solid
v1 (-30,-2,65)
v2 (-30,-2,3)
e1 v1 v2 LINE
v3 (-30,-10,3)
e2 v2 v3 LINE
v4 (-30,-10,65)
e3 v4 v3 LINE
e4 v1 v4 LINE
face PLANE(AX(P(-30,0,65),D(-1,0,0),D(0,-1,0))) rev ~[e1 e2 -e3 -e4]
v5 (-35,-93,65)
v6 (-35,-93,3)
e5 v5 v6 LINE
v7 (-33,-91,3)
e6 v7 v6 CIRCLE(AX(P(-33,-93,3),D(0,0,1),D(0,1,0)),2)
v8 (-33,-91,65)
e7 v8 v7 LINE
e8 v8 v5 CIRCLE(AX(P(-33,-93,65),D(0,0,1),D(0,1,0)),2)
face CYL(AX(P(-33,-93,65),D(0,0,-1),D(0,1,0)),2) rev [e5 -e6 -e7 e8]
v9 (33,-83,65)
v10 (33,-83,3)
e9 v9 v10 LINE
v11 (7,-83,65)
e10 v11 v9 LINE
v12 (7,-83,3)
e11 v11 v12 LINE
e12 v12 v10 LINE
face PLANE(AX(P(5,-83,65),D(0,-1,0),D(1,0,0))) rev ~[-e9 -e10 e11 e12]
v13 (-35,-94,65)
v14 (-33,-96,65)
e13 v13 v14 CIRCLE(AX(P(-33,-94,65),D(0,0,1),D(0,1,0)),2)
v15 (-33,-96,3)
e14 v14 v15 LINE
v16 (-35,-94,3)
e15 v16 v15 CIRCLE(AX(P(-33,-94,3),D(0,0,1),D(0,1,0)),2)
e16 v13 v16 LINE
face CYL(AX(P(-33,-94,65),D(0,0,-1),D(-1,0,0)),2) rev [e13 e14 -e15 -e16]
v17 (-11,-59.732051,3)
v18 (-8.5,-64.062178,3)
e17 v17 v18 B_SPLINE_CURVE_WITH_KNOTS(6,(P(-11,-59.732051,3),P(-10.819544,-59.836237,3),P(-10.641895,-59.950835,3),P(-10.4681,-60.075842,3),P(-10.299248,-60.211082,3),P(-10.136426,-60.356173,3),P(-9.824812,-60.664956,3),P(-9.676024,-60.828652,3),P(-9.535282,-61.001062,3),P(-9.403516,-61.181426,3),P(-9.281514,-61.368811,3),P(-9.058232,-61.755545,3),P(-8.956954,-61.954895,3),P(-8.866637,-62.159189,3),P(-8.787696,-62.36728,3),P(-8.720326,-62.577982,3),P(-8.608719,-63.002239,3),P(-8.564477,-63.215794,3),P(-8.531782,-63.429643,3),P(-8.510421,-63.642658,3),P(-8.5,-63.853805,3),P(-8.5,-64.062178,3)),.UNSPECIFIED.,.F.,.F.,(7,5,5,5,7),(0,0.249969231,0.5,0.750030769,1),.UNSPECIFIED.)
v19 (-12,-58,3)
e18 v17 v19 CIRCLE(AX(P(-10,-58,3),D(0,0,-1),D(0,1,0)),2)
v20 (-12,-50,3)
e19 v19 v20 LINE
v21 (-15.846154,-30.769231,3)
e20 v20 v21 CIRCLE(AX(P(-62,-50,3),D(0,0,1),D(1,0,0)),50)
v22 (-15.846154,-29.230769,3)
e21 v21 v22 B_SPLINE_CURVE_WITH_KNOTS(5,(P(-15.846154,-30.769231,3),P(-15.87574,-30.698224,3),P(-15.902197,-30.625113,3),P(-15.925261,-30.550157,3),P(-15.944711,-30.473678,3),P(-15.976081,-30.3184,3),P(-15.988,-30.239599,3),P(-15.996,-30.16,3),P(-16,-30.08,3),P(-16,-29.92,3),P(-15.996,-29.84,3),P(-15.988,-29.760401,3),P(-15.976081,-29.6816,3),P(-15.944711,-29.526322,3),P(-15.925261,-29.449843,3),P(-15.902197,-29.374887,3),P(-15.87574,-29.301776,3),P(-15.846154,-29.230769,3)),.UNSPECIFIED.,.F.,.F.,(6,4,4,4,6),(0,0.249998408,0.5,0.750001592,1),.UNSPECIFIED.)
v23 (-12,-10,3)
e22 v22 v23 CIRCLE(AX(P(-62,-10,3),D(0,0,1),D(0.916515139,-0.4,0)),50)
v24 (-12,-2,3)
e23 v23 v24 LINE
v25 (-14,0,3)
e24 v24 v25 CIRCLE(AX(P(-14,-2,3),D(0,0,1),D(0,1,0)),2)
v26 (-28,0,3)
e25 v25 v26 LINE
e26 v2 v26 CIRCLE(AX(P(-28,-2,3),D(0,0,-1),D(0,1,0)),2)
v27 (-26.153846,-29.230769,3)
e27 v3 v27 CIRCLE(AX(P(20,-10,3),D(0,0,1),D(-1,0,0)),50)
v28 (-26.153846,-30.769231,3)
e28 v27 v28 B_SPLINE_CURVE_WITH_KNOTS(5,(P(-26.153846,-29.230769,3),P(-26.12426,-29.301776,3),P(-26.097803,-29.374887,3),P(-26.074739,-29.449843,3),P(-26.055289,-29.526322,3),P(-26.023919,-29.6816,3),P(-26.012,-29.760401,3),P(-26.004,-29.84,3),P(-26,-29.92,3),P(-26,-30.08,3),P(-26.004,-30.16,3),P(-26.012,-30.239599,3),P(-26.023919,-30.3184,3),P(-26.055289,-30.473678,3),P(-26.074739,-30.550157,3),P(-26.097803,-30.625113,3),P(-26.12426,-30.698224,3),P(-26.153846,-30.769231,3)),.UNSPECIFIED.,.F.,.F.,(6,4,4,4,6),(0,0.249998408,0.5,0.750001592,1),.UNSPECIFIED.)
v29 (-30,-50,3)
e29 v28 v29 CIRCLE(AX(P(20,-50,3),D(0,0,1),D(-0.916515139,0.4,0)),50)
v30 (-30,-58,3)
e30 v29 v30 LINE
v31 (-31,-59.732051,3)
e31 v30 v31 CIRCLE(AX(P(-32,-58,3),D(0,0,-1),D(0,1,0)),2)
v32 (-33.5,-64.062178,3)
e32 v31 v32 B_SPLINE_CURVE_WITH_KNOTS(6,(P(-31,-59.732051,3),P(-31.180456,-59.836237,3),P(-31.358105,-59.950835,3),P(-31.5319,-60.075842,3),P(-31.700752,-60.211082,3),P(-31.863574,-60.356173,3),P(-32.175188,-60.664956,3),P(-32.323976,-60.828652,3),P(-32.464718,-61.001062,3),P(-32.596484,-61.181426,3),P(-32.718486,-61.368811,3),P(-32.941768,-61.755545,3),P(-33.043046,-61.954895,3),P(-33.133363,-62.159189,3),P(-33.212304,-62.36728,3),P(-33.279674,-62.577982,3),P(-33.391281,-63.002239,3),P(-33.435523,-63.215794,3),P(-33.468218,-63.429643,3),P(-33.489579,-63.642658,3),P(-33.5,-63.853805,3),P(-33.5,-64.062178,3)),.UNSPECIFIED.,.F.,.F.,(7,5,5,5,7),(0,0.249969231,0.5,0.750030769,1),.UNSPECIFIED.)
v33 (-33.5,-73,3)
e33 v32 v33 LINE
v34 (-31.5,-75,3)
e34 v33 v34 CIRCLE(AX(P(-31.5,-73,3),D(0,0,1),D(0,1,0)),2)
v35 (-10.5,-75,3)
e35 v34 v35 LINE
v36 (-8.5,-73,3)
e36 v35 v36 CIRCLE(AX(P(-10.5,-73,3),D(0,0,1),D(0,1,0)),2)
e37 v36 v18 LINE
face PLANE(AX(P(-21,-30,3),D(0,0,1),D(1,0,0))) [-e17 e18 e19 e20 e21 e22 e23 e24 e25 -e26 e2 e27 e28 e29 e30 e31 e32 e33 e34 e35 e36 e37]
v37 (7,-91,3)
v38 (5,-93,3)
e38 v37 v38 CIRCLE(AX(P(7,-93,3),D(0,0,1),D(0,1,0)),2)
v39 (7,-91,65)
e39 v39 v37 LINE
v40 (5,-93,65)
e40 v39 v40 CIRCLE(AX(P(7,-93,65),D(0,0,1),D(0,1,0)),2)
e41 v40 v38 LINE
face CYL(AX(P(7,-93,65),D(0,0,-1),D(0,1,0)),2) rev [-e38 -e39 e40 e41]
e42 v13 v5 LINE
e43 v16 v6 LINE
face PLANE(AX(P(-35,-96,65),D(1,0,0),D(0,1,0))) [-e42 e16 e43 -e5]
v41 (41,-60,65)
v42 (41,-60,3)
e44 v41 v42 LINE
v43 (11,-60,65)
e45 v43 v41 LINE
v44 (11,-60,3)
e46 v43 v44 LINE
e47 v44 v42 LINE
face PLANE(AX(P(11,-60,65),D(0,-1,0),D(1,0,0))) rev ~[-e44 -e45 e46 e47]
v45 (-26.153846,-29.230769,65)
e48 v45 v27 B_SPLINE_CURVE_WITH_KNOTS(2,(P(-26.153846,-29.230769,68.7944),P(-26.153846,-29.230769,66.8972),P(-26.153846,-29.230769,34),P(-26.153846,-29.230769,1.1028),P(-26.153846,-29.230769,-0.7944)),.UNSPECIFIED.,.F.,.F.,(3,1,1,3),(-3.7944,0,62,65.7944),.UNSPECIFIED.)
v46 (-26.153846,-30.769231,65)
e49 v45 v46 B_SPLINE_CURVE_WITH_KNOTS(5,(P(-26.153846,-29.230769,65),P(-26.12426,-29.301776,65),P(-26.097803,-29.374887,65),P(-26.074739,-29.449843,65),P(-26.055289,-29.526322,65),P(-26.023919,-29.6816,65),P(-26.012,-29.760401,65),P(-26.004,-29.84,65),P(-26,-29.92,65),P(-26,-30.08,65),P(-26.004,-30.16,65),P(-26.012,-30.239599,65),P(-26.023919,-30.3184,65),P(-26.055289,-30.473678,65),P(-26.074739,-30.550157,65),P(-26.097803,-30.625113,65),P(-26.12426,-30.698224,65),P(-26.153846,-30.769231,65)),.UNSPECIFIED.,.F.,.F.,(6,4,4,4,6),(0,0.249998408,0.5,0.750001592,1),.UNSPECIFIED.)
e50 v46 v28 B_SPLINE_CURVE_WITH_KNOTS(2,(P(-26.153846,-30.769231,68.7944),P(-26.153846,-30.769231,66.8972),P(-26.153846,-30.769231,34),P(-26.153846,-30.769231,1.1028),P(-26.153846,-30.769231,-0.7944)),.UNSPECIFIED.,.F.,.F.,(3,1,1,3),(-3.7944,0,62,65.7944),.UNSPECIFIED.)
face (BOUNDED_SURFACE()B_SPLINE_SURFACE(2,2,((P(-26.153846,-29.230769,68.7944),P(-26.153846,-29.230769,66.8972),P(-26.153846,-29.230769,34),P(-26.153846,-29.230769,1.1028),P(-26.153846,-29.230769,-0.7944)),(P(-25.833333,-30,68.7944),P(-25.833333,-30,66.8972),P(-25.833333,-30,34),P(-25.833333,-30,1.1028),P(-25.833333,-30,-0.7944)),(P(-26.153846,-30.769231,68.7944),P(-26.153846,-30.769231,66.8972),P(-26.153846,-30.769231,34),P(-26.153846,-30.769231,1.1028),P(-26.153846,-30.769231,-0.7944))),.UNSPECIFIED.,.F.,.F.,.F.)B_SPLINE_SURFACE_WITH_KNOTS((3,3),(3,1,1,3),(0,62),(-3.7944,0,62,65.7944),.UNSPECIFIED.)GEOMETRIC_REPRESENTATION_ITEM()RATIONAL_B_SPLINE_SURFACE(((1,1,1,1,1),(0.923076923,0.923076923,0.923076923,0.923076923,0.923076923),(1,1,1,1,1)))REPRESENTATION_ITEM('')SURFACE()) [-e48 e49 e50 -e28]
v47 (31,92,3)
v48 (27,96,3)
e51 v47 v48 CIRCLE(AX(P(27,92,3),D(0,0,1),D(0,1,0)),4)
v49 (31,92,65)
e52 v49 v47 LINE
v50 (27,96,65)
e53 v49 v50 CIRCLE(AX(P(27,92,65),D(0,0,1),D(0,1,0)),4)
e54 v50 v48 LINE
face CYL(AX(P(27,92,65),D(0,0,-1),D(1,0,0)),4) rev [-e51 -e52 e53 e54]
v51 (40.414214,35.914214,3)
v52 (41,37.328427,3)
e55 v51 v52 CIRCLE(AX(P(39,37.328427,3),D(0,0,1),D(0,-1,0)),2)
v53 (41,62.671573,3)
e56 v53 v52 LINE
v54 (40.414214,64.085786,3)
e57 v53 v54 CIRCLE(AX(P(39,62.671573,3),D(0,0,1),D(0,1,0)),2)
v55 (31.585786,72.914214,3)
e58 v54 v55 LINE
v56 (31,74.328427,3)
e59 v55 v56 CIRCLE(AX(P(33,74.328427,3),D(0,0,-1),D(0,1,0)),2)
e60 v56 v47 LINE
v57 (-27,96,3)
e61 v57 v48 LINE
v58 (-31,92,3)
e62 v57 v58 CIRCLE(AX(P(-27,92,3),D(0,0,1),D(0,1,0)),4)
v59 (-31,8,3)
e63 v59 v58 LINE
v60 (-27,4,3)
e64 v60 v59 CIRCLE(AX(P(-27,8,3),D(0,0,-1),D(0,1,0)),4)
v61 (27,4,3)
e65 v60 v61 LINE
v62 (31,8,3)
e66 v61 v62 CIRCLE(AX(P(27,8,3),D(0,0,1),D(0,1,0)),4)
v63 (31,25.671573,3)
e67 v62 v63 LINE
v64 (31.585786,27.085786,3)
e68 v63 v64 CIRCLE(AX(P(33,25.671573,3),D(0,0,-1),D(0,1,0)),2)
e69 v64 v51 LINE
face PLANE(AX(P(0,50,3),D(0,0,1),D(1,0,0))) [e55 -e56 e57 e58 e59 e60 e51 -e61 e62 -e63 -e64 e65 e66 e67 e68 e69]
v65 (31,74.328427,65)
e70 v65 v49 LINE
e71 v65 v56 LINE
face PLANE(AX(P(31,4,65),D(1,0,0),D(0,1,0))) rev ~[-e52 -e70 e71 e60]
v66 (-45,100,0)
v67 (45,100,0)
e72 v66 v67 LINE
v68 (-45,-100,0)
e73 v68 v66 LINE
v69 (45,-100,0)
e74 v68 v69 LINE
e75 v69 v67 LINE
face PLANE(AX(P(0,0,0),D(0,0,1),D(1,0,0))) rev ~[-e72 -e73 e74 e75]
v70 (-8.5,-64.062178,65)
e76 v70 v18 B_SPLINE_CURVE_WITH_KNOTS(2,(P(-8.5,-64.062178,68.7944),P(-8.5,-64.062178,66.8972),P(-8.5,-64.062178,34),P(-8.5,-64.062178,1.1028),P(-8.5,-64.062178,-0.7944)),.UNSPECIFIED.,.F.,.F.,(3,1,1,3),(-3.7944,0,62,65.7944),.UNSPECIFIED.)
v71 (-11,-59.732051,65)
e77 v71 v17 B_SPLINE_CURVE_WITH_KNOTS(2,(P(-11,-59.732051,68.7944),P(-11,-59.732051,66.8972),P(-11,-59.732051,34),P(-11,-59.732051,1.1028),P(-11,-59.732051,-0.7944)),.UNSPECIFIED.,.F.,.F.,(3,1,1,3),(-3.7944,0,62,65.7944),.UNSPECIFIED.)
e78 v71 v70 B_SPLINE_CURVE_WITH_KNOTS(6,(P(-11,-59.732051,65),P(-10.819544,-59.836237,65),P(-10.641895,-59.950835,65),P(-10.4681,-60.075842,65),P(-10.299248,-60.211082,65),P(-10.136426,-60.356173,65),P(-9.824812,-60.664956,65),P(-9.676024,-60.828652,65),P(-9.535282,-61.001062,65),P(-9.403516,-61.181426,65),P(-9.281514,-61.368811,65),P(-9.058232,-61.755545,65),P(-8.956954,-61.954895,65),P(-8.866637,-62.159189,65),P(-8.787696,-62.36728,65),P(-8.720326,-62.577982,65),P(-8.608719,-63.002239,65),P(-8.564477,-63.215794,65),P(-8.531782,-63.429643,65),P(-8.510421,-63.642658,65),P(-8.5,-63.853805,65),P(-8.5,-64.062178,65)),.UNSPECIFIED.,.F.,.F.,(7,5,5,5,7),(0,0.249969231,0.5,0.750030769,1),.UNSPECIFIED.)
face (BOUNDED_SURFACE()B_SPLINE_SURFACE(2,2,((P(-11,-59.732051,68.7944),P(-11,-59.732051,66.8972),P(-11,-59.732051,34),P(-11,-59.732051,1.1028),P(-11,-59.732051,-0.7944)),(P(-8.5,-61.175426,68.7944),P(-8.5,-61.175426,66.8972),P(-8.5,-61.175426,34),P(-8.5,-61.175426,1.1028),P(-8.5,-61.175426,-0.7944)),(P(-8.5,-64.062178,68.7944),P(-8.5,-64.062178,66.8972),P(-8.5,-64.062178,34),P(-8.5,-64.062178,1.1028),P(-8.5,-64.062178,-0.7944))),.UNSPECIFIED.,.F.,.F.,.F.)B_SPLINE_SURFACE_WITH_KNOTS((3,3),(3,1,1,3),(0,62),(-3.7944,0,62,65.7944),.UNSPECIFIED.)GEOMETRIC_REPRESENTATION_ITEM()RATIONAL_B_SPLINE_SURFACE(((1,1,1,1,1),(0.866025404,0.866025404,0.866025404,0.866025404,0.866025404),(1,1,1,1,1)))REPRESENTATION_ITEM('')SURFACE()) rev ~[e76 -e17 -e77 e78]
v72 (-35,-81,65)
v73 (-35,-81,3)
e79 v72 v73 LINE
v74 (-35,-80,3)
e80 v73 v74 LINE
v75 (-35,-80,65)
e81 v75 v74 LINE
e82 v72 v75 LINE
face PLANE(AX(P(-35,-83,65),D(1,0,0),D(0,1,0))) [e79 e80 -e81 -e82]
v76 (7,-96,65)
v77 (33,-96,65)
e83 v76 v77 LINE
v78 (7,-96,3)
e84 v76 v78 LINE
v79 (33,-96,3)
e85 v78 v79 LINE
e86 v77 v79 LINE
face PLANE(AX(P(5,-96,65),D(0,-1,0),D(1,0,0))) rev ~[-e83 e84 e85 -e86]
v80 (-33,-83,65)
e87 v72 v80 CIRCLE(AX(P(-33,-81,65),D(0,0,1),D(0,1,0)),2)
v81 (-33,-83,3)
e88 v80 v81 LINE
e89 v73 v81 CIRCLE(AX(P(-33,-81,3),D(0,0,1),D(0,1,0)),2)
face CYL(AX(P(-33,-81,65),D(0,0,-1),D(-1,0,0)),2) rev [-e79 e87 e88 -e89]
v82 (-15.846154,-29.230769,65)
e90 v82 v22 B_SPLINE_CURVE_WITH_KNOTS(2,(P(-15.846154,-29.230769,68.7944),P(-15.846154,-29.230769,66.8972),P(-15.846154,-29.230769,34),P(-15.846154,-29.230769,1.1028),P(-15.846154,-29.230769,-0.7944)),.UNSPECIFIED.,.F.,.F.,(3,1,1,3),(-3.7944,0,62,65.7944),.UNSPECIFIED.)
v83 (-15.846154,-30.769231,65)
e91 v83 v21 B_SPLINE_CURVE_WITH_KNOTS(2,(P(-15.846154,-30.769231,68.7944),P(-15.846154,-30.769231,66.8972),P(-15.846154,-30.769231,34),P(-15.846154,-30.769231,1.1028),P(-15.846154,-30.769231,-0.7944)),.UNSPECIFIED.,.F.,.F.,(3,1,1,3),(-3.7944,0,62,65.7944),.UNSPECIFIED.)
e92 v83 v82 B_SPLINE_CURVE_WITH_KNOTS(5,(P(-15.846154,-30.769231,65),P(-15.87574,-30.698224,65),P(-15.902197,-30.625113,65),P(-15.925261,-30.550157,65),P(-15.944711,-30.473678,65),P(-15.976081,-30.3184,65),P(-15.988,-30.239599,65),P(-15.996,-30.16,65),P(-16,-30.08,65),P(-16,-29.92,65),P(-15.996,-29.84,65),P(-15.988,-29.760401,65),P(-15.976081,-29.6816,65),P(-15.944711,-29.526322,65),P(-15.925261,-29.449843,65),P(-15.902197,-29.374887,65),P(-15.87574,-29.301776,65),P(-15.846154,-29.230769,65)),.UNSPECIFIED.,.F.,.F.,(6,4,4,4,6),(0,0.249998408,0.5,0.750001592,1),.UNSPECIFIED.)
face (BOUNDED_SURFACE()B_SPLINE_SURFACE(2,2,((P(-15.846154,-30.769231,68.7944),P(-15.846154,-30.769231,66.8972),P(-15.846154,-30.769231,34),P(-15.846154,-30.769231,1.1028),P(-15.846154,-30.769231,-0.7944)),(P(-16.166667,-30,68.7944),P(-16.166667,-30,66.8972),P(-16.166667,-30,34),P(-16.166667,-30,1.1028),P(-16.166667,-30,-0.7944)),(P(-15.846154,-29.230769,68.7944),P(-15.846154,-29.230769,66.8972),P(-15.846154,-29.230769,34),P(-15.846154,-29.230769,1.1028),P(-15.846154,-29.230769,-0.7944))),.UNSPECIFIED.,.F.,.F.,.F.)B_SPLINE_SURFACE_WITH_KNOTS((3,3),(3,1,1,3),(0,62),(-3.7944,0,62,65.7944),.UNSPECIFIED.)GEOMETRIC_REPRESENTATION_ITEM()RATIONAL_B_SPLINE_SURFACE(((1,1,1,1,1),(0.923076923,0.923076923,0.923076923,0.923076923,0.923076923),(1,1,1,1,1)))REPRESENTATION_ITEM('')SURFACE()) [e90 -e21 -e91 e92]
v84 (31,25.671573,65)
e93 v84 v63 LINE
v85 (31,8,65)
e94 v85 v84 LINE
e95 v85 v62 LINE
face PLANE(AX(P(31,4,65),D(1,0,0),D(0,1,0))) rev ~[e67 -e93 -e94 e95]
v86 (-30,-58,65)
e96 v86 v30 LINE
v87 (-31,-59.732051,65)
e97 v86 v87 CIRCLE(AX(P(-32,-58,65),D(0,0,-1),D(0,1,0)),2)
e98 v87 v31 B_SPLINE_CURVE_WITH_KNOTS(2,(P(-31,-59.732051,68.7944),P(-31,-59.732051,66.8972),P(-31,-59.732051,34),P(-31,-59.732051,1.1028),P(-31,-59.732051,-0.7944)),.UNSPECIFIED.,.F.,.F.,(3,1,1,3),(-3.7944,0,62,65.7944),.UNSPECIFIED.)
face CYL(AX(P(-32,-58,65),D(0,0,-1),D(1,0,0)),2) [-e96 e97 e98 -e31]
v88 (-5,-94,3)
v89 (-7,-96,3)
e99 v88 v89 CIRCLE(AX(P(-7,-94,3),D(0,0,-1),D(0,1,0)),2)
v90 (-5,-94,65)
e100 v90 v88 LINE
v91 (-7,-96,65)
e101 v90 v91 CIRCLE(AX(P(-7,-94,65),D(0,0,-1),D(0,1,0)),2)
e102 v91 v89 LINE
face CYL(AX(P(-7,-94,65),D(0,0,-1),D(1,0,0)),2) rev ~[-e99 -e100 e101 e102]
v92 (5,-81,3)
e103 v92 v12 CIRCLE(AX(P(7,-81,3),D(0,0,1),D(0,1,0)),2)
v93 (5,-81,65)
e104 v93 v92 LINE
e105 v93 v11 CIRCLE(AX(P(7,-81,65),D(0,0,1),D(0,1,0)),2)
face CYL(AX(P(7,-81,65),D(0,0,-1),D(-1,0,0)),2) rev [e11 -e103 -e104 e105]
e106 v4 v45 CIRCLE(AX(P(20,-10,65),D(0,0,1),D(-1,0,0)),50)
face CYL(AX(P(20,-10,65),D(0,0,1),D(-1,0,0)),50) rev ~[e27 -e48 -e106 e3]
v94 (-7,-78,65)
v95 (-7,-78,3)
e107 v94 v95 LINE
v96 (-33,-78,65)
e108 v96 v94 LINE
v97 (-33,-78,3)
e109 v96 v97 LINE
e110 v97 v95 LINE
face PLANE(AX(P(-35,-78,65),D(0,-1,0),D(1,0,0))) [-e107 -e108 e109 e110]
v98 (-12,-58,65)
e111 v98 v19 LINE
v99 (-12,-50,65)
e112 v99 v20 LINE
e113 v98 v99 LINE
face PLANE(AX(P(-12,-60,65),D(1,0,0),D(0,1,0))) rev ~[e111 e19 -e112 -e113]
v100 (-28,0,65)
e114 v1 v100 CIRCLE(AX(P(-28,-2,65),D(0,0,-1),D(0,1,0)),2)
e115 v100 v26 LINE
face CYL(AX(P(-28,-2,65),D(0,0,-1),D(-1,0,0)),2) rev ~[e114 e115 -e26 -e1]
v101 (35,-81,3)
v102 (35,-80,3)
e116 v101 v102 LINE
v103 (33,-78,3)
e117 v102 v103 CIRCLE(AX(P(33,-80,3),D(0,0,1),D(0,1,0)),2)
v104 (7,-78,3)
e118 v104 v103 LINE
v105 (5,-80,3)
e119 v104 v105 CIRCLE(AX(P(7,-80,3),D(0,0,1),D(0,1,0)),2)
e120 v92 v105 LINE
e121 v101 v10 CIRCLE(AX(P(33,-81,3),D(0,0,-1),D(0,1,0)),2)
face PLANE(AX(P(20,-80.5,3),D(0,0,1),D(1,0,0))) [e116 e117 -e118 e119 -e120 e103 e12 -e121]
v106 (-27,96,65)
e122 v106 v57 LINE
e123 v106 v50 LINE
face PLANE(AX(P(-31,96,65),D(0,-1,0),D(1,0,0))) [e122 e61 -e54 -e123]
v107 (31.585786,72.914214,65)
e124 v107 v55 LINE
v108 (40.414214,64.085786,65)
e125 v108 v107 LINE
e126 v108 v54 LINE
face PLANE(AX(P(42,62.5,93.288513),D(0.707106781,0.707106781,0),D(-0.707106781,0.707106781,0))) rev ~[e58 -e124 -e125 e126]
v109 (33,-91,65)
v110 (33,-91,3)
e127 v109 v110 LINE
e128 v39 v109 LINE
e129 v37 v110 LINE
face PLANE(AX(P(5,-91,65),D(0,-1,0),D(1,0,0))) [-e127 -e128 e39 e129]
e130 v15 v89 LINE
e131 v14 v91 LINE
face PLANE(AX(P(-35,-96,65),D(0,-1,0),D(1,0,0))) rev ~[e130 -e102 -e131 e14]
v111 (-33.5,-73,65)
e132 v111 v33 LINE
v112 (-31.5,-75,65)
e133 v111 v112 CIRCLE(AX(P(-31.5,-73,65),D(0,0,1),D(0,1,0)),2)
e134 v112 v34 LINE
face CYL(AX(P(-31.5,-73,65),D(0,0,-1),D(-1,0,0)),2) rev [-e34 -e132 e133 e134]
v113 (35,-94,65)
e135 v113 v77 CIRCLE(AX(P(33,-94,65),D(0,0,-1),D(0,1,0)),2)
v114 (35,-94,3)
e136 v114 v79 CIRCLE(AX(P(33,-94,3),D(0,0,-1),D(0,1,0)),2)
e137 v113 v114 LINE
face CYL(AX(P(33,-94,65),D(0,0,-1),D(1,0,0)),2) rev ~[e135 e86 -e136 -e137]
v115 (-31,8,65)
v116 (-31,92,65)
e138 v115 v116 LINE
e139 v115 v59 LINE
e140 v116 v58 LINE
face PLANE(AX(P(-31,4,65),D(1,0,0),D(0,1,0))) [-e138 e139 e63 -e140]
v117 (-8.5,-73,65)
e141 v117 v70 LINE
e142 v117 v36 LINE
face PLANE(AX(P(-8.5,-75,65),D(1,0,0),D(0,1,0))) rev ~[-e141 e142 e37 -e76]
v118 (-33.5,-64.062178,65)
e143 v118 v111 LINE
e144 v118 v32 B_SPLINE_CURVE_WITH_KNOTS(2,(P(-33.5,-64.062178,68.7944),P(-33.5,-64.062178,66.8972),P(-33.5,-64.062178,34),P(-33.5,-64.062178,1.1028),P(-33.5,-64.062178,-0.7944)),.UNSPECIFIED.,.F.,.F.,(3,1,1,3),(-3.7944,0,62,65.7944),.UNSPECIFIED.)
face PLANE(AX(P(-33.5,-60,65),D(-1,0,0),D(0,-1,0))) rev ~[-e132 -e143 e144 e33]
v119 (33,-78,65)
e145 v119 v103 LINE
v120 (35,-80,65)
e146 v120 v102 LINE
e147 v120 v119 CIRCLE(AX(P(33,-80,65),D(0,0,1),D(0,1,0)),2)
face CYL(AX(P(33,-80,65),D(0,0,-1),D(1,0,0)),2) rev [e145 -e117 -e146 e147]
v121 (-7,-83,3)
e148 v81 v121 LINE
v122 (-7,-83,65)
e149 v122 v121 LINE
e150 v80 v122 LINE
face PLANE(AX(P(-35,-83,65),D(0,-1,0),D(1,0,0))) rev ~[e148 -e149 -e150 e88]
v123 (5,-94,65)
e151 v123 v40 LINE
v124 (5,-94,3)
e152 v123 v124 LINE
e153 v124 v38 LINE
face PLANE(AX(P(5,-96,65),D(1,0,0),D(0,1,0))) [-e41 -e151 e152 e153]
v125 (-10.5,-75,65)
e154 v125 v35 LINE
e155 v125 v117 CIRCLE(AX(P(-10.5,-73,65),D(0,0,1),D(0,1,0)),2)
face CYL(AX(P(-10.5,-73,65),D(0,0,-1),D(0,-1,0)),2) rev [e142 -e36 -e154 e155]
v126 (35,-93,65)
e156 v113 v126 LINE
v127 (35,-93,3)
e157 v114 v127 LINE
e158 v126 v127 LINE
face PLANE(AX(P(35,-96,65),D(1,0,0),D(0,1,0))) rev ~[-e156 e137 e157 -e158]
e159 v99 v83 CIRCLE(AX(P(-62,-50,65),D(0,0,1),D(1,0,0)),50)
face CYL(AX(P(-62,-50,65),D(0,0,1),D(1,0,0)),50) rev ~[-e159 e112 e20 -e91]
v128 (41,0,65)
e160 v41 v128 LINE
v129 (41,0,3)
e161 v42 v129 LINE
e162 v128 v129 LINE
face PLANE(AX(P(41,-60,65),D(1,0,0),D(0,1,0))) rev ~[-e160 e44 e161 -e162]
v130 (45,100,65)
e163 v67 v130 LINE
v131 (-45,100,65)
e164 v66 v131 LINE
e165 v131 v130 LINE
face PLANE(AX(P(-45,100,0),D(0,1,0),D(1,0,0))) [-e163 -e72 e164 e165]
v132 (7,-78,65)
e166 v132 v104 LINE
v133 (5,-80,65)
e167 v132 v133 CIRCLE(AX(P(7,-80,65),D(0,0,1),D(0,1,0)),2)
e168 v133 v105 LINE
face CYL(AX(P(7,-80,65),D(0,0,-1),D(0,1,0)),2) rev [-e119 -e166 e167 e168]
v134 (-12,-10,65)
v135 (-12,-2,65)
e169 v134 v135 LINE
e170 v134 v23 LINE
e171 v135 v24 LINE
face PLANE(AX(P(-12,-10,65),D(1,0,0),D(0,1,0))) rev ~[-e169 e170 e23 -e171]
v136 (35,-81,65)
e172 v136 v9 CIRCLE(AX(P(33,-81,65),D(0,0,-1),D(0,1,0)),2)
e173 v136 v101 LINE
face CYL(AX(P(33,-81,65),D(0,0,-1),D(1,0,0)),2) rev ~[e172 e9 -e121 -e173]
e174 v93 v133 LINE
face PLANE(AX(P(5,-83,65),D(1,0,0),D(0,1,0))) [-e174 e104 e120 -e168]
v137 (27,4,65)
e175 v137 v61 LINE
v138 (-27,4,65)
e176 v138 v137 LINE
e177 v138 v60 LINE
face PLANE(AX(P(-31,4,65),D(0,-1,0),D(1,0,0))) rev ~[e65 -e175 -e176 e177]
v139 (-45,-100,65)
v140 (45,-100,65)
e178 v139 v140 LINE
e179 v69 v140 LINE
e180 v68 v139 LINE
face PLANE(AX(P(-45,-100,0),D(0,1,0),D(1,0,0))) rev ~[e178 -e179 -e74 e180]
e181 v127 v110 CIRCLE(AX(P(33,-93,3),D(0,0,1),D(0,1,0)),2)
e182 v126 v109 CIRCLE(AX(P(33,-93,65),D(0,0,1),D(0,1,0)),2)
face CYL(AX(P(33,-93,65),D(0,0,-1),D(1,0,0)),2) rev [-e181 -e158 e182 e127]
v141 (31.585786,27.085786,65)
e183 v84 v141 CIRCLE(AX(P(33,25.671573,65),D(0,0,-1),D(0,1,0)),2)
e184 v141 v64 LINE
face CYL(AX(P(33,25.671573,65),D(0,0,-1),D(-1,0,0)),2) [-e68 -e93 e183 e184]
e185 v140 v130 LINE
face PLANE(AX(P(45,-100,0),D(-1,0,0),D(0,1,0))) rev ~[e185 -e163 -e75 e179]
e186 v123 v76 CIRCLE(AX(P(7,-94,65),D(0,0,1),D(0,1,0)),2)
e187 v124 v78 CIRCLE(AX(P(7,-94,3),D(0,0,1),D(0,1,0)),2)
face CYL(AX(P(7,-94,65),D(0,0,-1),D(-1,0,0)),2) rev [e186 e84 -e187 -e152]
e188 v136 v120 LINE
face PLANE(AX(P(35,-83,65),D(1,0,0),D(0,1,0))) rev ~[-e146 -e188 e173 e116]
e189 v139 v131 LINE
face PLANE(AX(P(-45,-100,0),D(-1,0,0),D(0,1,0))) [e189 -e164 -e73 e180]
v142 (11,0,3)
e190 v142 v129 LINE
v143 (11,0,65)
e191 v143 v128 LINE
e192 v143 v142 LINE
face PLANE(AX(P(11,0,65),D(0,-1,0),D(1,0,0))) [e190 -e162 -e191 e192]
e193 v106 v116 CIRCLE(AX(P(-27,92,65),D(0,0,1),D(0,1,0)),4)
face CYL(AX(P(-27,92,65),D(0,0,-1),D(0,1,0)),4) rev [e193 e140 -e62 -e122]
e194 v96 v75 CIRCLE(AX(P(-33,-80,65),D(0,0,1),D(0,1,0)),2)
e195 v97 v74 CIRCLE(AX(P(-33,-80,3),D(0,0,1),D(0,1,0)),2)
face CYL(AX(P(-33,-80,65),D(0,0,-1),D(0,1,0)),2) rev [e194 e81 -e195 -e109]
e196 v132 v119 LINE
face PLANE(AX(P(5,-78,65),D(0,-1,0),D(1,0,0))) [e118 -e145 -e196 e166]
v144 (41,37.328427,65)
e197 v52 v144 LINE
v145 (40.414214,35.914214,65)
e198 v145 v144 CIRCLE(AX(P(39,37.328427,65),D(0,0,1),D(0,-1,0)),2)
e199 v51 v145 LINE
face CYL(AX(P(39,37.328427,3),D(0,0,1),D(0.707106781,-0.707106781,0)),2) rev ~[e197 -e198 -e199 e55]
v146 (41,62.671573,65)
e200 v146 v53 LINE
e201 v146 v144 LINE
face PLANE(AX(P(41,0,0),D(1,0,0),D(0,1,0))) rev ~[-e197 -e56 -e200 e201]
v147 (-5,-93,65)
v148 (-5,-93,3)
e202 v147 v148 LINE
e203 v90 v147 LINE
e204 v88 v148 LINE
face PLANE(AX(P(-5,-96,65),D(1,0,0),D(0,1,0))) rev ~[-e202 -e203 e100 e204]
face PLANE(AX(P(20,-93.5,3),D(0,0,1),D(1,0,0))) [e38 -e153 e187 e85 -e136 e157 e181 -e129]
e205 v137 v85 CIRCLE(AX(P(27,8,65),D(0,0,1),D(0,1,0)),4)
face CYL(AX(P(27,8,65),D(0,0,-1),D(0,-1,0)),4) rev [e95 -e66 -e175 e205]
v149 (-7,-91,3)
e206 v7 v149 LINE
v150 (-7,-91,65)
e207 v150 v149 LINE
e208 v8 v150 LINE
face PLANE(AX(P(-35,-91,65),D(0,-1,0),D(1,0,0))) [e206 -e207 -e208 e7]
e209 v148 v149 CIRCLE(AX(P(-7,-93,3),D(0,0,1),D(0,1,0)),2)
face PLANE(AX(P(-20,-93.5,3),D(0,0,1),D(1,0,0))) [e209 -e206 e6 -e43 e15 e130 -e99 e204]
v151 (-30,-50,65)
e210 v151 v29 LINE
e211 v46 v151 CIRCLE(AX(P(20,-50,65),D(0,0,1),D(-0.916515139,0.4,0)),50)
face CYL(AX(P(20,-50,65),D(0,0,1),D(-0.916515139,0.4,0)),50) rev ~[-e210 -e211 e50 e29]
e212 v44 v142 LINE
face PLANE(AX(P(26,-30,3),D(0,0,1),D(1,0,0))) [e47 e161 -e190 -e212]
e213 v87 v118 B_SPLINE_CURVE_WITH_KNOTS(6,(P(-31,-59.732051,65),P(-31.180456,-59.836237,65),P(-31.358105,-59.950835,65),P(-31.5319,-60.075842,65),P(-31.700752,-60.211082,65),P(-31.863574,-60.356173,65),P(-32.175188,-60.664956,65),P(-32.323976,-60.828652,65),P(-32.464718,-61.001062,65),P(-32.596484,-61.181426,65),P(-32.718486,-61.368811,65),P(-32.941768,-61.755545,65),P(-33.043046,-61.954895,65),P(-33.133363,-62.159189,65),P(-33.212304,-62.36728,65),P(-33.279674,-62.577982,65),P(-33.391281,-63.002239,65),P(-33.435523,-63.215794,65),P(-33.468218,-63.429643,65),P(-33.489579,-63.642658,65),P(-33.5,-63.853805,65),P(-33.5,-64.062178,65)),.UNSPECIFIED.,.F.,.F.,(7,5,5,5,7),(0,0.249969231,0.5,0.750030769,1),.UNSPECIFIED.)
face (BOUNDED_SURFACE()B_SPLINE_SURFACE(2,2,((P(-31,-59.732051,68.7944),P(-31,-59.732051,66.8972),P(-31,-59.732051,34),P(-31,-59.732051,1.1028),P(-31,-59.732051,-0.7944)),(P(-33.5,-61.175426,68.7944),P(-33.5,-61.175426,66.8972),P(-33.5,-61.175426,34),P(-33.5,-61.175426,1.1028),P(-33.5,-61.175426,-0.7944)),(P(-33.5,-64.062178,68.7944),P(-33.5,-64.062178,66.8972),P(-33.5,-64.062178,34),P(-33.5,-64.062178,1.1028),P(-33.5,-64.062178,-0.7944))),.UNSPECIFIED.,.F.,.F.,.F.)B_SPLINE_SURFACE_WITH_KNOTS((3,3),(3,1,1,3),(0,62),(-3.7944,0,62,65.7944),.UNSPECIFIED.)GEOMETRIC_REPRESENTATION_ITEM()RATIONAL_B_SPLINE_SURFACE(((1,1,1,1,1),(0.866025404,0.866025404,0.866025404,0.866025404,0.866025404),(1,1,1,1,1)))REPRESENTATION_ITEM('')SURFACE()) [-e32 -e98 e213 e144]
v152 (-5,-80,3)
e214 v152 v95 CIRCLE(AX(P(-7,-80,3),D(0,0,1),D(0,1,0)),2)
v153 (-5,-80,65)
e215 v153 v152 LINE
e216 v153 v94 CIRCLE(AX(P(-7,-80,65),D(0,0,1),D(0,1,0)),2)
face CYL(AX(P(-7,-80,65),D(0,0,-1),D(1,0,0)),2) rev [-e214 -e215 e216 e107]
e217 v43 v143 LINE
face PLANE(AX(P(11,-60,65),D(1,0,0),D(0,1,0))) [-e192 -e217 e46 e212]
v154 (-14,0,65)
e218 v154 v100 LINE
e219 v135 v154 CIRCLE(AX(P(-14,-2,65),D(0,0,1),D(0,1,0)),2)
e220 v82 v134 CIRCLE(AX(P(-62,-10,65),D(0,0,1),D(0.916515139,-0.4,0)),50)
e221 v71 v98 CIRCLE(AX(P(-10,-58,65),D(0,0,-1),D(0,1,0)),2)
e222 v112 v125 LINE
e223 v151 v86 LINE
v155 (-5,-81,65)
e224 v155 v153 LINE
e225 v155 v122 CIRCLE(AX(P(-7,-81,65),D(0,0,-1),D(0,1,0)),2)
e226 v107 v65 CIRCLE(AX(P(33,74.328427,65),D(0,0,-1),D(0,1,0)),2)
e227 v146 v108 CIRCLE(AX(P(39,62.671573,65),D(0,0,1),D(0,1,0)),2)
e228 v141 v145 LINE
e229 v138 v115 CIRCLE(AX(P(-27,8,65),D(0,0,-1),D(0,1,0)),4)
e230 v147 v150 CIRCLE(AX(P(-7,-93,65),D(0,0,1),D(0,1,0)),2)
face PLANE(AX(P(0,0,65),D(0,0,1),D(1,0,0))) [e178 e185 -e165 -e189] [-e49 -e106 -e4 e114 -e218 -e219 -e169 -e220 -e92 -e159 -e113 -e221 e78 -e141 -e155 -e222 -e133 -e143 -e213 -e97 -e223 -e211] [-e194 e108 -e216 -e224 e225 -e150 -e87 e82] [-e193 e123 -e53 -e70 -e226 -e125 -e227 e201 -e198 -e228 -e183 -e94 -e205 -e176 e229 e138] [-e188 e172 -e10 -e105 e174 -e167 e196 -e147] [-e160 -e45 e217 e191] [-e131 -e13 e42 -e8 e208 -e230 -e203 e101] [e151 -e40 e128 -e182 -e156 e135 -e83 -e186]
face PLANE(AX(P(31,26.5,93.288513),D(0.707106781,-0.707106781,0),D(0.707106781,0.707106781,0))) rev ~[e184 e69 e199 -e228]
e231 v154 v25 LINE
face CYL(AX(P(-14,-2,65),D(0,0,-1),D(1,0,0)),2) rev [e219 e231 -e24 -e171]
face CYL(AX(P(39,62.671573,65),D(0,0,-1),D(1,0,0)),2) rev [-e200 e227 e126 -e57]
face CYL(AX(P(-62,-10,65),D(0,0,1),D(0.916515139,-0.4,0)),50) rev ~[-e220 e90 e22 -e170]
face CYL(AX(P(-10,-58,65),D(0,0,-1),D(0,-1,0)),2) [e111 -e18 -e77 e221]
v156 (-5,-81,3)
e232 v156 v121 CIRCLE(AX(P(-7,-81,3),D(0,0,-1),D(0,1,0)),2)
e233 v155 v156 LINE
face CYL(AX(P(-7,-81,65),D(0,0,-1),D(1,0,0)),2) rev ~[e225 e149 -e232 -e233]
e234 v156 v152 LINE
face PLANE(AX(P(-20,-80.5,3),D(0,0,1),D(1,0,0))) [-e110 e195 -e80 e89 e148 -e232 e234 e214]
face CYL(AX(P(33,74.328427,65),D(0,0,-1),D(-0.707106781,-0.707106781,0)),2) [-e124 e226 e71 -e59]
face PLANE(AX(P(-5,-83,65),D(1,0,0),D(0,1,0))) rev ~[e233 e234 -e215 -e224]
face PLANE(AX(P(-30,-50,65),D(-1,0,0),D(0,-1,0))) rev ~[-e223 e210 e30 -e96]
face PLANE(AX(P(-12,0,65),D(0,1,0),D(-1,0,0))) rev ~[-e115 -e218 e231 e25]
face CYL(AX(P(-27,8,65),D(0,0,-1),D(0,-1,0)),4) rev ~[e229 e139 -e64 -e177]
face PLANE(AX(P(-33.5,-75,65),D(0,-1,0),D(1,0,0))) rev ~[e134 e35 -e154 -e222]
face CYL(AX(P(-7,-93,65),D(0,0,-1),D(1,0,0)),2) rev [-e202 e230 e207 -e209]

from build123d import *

# Parameters (mm, degrees)
F0_W        = 90
F0_H        = 200
F1_DEPTH    = 65
F2_W        = 62
F2_H        = 92
F2_W_2      = 30
F2_H_2      = 60
F2_H_3      = 5
F3_DEPTH    = 62
F4_R        = 4
F6_W        = 10
F6_H        = 25
F7_DEPTH    = 62
F8_T4_DEPTH = 90.2885128676
F8_T9_DEPTH = 90.2885128676
F9_R        = 2
F10_R       = 5


# Not quite as in the source:
# - a fillet or chamfer that OpenCascade refuses, or shapes differently, is made with other operations: its cross-section is extruded or revolved along the edge and cut away or added


with BuildPart() as f1:
    # F0 (on Top) → F1 (new body)
    with BuildSketch(Plane.XY):
        Rectangle(F0_W, F0_H)
    extrude(amount=F1_DEPTH)

    # F2 (on face) → F3 (cut)
    with BuildSketch(Plane.XY.offset(65)):
        with Locations((0, 50)):
            Rectangle(F2_W, F2_H)
        with Locations((26, -30)):
            Rectangle(F2_W_2, F2_H_2)
        with Locations((20, -80.5)):
            Rectangle(F2_W_2, F2_H_3)
        with Locations((20, -93.5)):
            Rectangle(F2_W_2, F2_H_3)
        with Locations((-20, -93.5)):
            Rectangle(F2_W_2, F2_H_3)
        with Locations((-20, -80.5)):
            Rectangle(F2_W_2, F2_H_3)
        with BuildLine():
            Line((-12, 0), (-30, 0))
            Line((-30, 0), (-30, -10))
            ThreePointArc((-30, -10), (-28.9453156465, -20.2154821845), (-25.8257569496, -30))
            ThreePointArc((-25.8257569496, -30), (-28.9453156465, -39.7845178155), (-30, -50))
            Line((-30, -50), (-30, -60))
            Line((-30, -60), (-12, -60))
            Line((-12, -60), (-12, -50))
            ThreePointArc((-12, -50), (-13.0546843535, -39.7845178155), (-16.1742430504, -30))
            ThreePointArc((-16.1742430504, -30), (-13.0546843535, -20.2154821845), (-12, -10))
            Line((-12, -10), (-12, 0))
        make_face()
    extrude(amount=-F3_DEPTH, mode=Mode.SUBTRACT)

    # F4
    f4_edges = [f1.edges().sort_by_distance(p)[0] for p in [
        (-31, 96, 34),
        (31, 96, 34),
        (-31, 4, 34),
        (31, 4, 34),
    ]]
    fillet(f4_edges, radius=F4_R)

    # F6 (on face) → F7 (cut, through all)
    with BuildSketch(Plane.XY.offset(65)):
        with Locations((36, 50)):
            Rectangle(F6_W, F6_H)
        Polygon((-30, -60), (-33.5, -60), (-33.5, -75), (-8.5, -75), (-8.5, -60), (-12, -60), align=None)
    extrude(amount=-F7_DEPTH, mode=Mode.SUBTRACT)

    # F8: chamfer of 11 on 2 edges, made by hand


with BuildPart() as f8_tool2:
    # F8_s3 → F8_t4 (new body)
    with BuildSketch(Plane.XY.offset(93.2885128676)):
        Polygon((42, 62.5), (31, 73.5), (31, 62.5), align=None)
    extrude(amount=-F8_T4_DEPTH)

    split(bisect_by=Plane.YZ.offset(41), keep=Keep.BOTTOM)


with BuildPart() as f1_1:
    add(f1.part)

    # F8_t1: cut F8_tool2
    add(f8_tool2.part, mode=Mode.SUBTRACT)


with BuildPart() as f8_tool7:
    # F8_s8 → F8_t9 (new body)
    with BuildSketch(Plane.XY.offset(93.2885128676)):
        Polygon((31, 26.5), (42, 37.5), (31, 37.5), align=None)
    extrude(amount=-F8_T9_DEPTH)

    split(bisect_by=Plane.YZ.offset(41), keep=Keep.BOTTOM)


with BuildPart() as f1_2:
    add(f1_1.part)

    # F8_t6: cut F8_tool7
    add(f8_tool7.part, mode=Mode.SUBTRACT)

    # F9
    f9_edges = [f1_2.edges().sort_by_distance(p)[0] for p in [
        (31, 73.5, 34),
        (41, 63.5, 34),
        (41, 36.5, 34),
        (31, 26.5, 34),
        (-30, 0, 34),
        (-12, 0, 34),
        (-16.174243, -30, 34),
        (-25.825757, -30, 34),
        (-30, -60, 34),
        (-12, -60, 34),
        (-8.5, -75, 34),
        (-33.5, -75, 34),
        (-35, -78, 34),
        (-35, -91, 34),
        (5, -91, 34),
        (5, -78, 34),
        (-5, -91, 34),
        (-5, -78, 34),
        (35, -78, 34),
        (35, -91, 34),
        (-5, -83, 34),
        (-5, -96, 34),
        (35, -96, 34),
        (35, -83, 34),
        (5, -96, 34),
        (5, -83, 34),
        (-35, -83, 34),
        (-35, -96, 34),
    ]]
    fillet(f9_edges, radius=F9_R)

    # F10
    f10_edges = [f1_2.edges().sort_by_distance(p)[0] for p in [
        (-33.5, -60, 34),
        (-8.5, -60, 34),
    ]]
    fillet(f10_edges, radius=F10_R)


solid = f1_2.part
